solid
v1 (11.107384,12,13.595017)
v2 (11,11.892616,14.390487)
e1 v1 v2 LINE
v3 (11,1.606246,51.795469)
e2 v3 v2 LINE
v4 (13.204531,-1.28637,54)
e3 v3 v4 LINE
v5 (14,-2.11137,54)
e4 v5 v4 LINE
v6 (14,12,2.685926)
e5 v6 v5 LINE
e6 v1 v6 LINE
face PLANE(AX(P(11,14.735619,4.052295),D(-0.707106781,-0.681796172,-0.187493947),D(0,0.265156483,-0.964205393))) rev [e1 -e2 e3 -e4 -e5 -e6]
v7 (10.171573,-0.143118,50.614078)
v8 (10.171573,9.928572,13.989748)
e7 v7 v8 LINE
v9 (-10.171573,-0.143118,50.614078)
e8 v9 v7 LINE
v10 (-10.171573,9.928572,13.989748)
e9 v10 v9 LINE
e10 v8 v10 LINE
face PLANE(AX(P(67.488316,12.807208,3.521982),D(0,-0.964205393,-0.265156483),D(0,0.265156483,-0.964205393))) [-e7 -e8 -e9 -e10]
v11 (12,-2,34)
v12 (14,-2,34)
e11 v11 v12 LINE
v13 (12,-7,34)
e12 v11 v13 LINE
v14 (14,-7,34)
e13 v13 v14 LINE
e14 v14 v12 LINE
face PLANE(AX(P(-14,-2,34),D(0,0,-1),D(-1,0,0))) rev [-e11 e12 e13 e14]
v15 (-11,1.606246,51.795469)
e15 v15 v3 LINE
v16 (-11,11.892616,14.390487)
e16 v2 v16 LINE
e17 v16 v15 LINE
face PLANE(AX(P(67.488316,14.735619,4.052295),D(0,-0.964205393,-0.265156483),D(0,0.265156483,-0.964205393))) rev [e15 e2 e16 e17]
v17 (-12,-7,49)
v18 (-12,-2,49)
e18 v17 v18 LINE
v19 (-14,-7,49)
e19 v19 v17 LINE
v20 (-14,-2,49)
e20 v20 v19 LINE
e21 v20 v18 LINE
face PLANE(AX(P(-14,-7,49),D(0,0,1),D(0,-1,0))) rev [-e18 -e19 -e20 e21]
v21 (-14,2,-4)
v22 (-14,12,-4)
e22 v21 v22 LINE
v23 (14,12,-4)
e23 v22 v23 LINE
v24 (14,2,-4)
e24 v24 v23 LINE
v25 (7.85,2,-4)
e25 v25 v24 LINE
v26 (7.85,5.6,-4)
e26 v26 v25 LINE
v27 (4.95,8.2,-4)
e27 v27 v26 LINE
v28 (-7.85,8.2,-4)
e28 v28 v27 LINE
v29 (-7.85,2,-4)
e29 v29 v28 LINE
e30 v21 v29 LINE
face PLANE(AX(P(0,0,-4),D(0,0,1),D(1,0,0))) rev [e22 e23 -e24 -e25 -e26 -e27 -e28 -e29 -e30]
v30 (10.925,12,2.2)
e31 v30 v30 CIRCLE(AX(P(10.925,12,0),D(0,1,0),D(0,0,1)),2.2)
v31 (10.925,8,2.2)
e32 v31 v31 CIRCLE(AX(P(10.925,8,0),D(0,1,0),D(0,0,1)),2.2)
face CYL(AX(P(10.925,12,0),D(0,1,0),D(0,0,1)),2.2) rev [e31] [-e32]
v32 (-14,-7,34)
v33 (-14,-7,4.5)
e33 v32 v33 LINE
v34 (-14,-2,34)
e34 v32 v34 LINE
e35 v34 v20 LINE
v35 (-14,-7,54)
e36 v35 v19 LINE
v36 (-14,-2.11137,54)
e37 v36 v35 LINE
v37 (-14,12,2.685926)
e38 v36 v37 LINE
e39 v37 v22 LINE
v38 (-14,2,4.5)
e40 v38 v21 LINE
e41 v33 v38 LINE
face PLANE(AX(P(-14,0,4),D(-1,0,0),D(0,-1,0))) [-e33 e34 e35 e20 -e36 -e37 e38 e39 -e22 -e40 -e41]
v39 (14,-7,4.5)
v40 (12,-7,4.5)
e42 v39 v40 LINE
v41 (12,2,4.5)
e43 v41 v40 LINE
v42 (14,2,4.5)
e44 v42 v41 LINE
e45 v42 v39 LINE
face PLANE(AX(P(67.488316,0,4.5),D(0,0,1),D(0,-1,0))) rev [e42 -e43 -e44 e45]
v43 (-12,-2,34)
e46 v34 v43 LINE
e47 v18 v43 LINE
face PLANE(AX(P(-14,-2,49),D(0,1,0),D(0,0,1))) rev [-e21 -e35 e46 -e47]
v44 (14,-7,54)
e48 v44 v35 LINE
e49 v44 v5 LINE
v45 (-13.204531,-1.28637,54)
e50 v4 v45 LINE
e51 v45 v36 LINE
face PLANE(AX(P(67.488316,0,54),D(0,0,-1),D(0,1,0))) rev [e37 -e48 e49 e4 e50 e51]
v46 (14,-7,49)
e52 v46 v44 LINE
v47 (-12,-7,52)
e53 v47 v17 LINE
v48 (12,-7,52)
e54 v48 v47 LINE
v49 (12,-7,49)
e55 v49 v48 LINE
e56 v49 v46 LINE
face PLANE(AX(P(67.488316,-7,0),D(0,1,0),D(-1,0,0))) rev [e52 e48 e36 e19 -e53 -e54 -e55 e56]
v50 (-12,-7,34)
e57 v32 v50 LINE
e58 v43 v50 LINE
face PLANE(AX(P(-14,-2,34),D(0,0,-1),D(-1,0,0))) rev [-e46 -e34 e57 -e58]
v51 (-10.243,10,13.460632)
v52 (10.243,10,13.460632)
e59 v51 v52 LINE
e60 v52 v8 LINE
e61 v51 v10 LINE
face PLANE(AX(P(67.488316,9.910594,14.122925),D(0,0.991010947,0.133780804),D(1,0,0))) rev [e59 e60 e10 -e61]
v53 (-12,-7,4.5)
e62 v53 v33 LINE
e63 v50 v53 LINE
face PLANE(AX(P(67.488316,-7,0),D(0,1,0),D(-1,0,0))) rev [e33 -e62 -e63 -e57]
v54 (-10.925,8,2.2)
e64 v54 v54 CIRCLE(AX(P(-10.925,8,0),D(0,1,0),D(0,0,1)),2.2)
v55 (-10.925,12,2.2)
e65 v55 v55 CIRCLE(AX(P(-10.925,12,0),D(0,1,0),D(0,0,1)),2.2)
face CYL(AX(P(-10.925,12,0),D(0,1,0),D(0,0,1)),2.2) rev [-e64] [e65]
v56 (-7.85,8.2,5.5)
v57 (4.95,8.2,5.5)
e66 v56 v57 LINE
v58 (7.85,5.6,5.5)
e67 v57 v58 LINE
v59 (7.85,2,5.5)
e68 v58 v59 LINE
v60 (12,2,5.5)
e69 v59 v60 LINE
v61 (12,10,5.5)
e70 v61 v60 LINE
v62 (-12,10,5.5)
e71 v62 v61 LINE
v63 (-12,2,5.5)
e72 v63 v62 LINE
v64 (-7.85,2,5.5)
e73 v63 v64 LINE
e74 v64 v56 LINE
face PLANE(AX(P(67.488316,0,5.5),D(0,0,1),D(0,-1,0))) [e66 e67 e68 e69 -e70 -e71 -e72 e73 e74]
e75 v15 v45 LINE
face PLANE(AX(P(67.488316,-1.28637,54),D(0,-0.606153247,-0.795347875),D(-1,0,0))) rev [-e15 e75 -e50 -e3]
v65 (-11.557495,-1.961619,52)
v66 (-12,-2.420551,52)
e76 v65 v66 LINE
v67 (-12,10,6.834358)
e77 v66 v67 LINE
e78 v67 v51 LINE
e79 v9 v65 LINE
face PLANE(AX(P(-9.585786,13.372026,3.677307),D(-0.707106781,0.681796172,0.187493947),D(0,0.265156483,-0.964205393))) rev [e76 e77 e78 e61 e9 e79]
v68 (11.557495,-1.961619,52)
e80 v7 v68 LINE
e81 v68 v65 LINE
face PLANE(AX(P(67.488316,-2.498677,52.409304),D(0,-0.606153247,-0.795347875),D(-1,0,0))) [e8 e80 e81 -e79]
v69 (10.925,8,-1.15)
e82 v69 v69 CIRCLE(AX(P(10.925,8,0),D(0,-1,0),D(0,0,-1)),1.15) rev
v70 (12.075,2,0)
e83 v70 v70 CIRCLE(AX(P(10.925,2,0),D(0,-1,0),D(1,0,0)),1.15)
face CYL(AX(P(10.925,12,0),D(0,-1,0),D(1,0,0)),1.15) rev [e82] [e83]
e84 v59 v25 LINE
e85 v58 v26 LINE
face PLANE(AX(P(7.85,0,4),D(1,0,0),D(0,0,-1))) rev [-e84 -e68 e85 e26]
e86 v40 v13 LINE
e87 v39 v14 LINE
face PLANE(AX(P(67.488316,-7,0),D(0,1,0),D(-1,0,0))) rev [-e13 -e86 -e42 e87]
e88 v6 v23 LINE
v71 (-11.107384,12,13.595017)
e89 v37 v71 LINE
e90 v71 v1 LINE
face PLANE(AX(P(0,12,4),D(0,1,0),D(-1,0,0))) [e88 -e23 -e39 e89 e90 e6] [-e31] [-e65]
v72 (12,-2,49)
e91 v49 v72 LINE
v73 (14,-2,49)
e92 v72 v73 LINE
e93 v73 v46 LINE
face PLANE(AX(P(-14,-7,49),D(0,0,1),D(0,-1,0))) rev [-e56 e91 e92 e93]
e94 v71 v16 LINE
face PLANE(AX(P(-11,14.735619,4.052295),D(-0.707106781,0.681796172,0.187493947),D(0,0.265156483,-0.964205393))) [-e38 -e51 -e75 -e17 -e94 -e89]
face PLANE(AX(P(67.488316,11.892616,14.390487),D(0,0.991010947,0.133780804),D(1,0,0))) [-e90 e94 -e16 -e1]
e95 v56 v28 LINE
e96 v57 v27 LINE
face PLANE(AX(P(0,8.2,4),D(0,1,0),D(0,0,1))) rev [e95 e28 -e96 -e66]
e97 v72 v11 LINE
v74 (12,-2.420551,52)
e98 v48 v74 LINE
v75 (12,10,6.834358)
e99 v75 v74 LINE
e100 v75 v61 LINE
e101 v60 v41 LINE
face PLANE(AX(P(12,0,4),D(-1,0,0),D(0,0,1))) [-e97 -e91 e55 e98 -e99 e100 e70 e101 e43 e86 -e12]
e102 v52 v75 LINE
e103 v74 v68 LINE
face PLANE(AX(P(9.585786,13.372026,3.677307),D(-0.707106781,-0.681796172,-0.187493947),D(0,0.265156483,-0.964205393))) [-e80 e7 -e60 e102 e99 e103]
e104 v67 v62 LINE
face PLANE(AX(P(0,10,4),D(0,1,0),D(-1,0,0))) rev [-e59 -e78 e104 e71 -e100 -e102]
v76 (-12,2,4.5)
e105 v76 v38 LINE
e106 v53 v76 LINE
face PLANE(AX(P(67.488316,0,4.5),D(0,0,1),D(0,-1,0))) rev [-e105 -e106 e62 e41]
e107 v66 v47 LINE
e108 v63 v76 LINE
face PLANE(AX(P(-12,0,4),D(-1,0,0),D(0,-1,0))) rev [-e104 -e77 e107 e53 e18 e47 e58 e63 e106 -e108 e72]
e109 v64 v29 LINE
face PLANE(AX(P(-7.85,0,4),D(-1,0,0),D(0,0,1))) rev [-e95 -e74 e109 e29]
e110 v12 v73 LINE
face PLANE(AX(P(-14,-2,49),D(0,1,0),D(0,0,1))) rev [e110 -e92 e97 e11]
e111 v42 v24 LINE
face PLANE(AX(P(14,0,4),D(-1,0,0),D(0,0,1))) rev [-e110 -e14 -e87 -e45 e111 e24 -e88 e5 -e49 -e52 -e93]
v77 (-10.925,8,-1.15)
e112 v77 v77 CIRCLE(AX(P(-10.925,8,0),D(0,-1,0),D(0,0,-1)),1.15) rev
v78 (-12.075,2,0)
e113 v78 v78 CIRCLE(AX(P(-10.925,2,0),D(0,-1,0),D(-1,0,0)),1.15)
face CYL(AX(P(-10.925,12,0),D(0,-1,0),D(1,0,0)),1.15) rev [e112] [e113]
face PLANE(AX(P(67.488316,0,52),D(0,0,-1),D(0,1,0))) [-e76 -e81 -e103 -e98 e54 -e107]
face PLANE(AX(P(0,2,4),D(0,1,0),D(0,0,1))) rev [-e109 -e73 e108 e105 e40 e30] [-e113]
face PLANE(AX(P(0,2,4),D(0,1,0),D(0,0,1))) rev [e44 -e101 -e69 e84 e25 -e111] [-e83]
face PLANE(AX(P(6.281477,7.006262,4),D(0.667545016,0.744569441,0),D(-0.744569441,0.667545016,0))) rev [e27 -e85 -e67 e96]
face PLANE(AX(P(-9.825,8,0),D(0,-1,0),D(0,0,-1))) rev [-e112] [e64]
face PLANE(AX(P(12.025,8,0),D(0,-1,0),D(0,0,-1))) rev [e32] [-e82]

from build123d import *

# Parameters (mm, degrees)
BOSS_EXTRU_1_DEPTH                                = 4
ESQUISSE2_R                                       = 1.15
ENL_V_MAT_EXTRU_1_DEPTH                           = 18.663521733
CHAMBRAGE_POUR_VIS_SIX_PANS_CREUX_M21_D           = 2.2
CHAMBRAGE_POUR_VIS_SIX_PANS_CREUX_M21_CBORE_D     = 4.4
CHAMBRAGE_POUR_VIS_SIX_PANS_CREUX_M21_CBORE_DEPTH = 4
BOSS_EXTRU_2_DEPTH                                = 28
COQUE1_START                                      = -12
COQUE1_DEPTH                                      = 24
COQUE1_START_2                                    = -51.994775807
COQUE1_2_DEPTH                                    = 48.056615462
ENL_V_MAT_EXTRU_2_DEPTH                           = 11
ESQUISSE8_W                                       = 15
ESQUISSE8_H                                       = 5
ENL_V_MAT_EXTRU_3_DEPTH                           = 63


with BuildPart() as part:
    # Esquisse1 → Boss.-Extru.1 (new, symmetric)
    with BuildSketch(Plane.XY):
        Polygon((-14, 2), (-7.85, 2), (-7.85, 8.2), (4.95, 8.2), (7.85, 5.6), (7.85, 2), (14, 2), (14, 12), (-14, 12), align=None)
    extrude(amount=BOSS_EXTRU_1_DEPTH, both=True)

    # Esquisse2 → Enlèv. mat.-Extru.1 (cut, through all)
    with BuildSketch(Plane.XZ.offset(-2)):
        with Locations((10.925, 0)):
            Circle(ESQUISSE2_R)
        with Locations(Location((-10.925, 0, 0), (0, 0, 180))):
            Circle(ESQUISSE2_R)
    extrude(amount=-ENL_V_MAT_EXTRU_1_DEPTH, mode=Mode.SUBTRACT)

    # Chambrage pour vis à six pans creux M21 (through all)
    with Locations(Plane(origin=(0, 12, 0), x_dir=(1, 0, 0), z_dir=(0, 1, 0))):
        with Locations((-10.925, 0), (10.925, 0)):
            CounterBoreHole(CHAMBRAGE_POUR_VIS_SIX_PANS_CREUX_M21_D / 2, CHAMBRAGE_POUR_VIS_SIX_PANS_CREUX_M21_CBORE_D / 2, CHAMBRAGE_POUR_VIS_SIX_PANS_CREUX_M21_CBORE_DEPTH)

    # Esquisse6 → Boss.-Extru.2 (add)
    with BuildSketch(Plane.ZY.offset(14)):
        Polygon((4.5, 2), (4, 2), (4, 12), (14, 12), (54, 1), (54, -7), (4.5, -7), align=None)
    extrude(amount=-BOSS_EXTRU_2_DEPTH)

    # Chanfrein1
    # the kernel refuses this chamfer: 3 mm, written as the material it takes off along each edge
    with BuildSketch(Plane(origin=(-19.957306113, 1, 54), x_dir=(0, 0.2651564830210424, -0.9642053928037904), z_dir=(1, 0, 0))) as chanfrein1_piece_1:
        with BuildLine():
            Line((2.381812022, 0.07273839), (-0.701687646, -2.277268941))
            Line((-0.701687646, -2.277268941), (-0.75953997, -2.261359552))
            ThreePointArc((-0.75953997, -2.261359552), (-0.373628773, -1.132368609), (-0.057852324, 0.015909389))
            Line((-0.057852324, 0.015909389), (0, 0.06))
            ThreePointArc((0, 0.06), (1.190906011, 0.06), (2.381812022, 0.13273839))
            Line((2.381812022, 0.13273839), (2.381812022, 0.07273839))
        make_face()
    extrude(amount=39.914612227, mode=Mode.SUBTRACT)
    with BuildSketch(Plane(origin=(14, 15.477681924, 1.353883912), x_dir=(-1, 0, 0), z_dir=(0, -0.26515648302104217, 0.9642053928037905))) as chanfrein1_piece_2:
        with BuildLine():
            Line((3.084852814, -0.084852814), (-0.084852814, 3.084852814))
            Line((-0.084852814, 3.084852814), (-0.144852814, 3.084852814))
            ThreePointArc((-0.144852814, 3.084852814), (-0.06, 1.542426407), (-0.06, 0))
            Line((-0.06, 0), (0, -0.06))
            ThreePointArc((0, -0.06), (1.542426407, -0.06), (3.084852814, -0.144852814))
            Line((3.084852814, -0.144852814), (3.084852814, -0.084852814))
        make_face()
    extrude(amount=62.315569228, mode=Mode.SUBTRACT)
    with BuildSketch(Plane(origin=(-15.310375108, 12, 14), x_dir=(0, 0, -1), z_dir=(1, 0, 0))) as chanfrein1_piece_3:
        with BuildLine():
            Line((0.523904139, 0.016053697), (-0.509407938, -0.123437518))
            Line((-0.509407938, -0.123437518), (-0.525317327, -0.065585195))
            ThreePointArc((-0.525317327, -0.065585195), (-0.268484987, -0.011605966), (-0.015909389, 0.057852324))
            Line((-0.015909389, 0.057852324), (0, 0.06))
            ThreePointArc((0, 0.06), (0.261952069, 0.06), (0.523904139, 0.076053697))
            Line((0.523904139, 0.076053697), (0.523904139, 0.016053697))
        make_face()
    extrude(amount=30.620750216, mode=Mode.SUBTRACT)
    with BuildSketch(Plane(origin=(-14, 15.477681924, 1.353883912), x_dir=(1, 0, 0), z_dir=(0, -0.26515648302104217, 0.9642053928037905))) as chanfrein1_piece_4:
        with BuildLine():
            Line((3.084852814, 0.084852814), (-0.084852814, -3.084852814))
            Line((-0.084852814, -3.084852814), (-0.144852814, -3.084852814))
            ThreePointArc((-0.144852814, -3.084852814), (-0.06, -1.542426407), (-0.06, 0))
            Line((-0.06, 0), (0, 0.06))
            ThreePointArc((0, 0.06), (1.542426407, 0.06), (3.084852814, 0.144852814))
            Line((3.084852814, 0.144852814), (3.084852814, 0.084852814))
        make_face()
    extrude(amount=62.315569228, mode=Mode.SUBTRACT)

    # Coque1: read off the stored shape, not the designer's step
    # Coque1 outline → Coque1 (cut)
    with BuildSketch(Plane.YZ.offset(COQUE1_START)):
        Polygon((-7, 5.5), (10, 5.5), (10, 13.460632375), (9.928572392, 13.989748207), (-0.143118288, 50.614077951), (-1.961619074, 52), (-7, 52), align=None)
    extrude(amount=COQUE1_DEPTH, mode=Mode.SUBTRACT)

    # Coque1 2 outline → Coque1 2 (add)
    with BuildSketch(Plane(origin=(0, 0, 0), x_dir=(1, 0, 0), z_dir=(0, 0.26515648302104255, -0.9642053928037904)).offset(COQUE1_START_2)):
        Polygon((12, -11.454228351), (10.171572875, -13.282655476), (12, -13.282655476), align=None)
        Polygon((-10.171572875, -13.282655476), (-12, -11.454228351), (-12, -13.282655476), align=None)
    extrude(amount=COQUE1_2_DEPTH)

    # Esquisse7 → Enlèv. mat.-Extru.2 (cut)
    with BuildSketch(Plane(origin=(0, 0, -4), x_dir=(-1, 0, 0), z_dir=(0, 0, -1))):
        Polygon((-12, 2), (-12, -7), (12, -7), (12, 2), (7.85, 2), (-7.85, 2), align=None)
        Polygon((-7.85, 2), (7.85, 2), (7.85, 8.2), (-4.95, 8.2), (-7.85, 5.6), align=None)
    extrude(amount=-ENL_V_MAT_EXTRU_2_DEPTH, mode=Mode.SUBTRACT)

    # Esquisse8 → Enlèv. mat.-Extru.3 (cut, through all)
    with BuildSketch(Plane(origin=(14, 0, 0), x_dir=(0, 0, -1), z_dir=(1, 0, 0))):
        with Locations((-41.5, -4.5)):
            Rectangle(ESQUISSE8_W, ESQUISSE8_H)
    extrude(amount=-ENL_V_MAT_EXTRU_3_DEPTH, mode=Mode.SUBTRACT)


solid = part.part
